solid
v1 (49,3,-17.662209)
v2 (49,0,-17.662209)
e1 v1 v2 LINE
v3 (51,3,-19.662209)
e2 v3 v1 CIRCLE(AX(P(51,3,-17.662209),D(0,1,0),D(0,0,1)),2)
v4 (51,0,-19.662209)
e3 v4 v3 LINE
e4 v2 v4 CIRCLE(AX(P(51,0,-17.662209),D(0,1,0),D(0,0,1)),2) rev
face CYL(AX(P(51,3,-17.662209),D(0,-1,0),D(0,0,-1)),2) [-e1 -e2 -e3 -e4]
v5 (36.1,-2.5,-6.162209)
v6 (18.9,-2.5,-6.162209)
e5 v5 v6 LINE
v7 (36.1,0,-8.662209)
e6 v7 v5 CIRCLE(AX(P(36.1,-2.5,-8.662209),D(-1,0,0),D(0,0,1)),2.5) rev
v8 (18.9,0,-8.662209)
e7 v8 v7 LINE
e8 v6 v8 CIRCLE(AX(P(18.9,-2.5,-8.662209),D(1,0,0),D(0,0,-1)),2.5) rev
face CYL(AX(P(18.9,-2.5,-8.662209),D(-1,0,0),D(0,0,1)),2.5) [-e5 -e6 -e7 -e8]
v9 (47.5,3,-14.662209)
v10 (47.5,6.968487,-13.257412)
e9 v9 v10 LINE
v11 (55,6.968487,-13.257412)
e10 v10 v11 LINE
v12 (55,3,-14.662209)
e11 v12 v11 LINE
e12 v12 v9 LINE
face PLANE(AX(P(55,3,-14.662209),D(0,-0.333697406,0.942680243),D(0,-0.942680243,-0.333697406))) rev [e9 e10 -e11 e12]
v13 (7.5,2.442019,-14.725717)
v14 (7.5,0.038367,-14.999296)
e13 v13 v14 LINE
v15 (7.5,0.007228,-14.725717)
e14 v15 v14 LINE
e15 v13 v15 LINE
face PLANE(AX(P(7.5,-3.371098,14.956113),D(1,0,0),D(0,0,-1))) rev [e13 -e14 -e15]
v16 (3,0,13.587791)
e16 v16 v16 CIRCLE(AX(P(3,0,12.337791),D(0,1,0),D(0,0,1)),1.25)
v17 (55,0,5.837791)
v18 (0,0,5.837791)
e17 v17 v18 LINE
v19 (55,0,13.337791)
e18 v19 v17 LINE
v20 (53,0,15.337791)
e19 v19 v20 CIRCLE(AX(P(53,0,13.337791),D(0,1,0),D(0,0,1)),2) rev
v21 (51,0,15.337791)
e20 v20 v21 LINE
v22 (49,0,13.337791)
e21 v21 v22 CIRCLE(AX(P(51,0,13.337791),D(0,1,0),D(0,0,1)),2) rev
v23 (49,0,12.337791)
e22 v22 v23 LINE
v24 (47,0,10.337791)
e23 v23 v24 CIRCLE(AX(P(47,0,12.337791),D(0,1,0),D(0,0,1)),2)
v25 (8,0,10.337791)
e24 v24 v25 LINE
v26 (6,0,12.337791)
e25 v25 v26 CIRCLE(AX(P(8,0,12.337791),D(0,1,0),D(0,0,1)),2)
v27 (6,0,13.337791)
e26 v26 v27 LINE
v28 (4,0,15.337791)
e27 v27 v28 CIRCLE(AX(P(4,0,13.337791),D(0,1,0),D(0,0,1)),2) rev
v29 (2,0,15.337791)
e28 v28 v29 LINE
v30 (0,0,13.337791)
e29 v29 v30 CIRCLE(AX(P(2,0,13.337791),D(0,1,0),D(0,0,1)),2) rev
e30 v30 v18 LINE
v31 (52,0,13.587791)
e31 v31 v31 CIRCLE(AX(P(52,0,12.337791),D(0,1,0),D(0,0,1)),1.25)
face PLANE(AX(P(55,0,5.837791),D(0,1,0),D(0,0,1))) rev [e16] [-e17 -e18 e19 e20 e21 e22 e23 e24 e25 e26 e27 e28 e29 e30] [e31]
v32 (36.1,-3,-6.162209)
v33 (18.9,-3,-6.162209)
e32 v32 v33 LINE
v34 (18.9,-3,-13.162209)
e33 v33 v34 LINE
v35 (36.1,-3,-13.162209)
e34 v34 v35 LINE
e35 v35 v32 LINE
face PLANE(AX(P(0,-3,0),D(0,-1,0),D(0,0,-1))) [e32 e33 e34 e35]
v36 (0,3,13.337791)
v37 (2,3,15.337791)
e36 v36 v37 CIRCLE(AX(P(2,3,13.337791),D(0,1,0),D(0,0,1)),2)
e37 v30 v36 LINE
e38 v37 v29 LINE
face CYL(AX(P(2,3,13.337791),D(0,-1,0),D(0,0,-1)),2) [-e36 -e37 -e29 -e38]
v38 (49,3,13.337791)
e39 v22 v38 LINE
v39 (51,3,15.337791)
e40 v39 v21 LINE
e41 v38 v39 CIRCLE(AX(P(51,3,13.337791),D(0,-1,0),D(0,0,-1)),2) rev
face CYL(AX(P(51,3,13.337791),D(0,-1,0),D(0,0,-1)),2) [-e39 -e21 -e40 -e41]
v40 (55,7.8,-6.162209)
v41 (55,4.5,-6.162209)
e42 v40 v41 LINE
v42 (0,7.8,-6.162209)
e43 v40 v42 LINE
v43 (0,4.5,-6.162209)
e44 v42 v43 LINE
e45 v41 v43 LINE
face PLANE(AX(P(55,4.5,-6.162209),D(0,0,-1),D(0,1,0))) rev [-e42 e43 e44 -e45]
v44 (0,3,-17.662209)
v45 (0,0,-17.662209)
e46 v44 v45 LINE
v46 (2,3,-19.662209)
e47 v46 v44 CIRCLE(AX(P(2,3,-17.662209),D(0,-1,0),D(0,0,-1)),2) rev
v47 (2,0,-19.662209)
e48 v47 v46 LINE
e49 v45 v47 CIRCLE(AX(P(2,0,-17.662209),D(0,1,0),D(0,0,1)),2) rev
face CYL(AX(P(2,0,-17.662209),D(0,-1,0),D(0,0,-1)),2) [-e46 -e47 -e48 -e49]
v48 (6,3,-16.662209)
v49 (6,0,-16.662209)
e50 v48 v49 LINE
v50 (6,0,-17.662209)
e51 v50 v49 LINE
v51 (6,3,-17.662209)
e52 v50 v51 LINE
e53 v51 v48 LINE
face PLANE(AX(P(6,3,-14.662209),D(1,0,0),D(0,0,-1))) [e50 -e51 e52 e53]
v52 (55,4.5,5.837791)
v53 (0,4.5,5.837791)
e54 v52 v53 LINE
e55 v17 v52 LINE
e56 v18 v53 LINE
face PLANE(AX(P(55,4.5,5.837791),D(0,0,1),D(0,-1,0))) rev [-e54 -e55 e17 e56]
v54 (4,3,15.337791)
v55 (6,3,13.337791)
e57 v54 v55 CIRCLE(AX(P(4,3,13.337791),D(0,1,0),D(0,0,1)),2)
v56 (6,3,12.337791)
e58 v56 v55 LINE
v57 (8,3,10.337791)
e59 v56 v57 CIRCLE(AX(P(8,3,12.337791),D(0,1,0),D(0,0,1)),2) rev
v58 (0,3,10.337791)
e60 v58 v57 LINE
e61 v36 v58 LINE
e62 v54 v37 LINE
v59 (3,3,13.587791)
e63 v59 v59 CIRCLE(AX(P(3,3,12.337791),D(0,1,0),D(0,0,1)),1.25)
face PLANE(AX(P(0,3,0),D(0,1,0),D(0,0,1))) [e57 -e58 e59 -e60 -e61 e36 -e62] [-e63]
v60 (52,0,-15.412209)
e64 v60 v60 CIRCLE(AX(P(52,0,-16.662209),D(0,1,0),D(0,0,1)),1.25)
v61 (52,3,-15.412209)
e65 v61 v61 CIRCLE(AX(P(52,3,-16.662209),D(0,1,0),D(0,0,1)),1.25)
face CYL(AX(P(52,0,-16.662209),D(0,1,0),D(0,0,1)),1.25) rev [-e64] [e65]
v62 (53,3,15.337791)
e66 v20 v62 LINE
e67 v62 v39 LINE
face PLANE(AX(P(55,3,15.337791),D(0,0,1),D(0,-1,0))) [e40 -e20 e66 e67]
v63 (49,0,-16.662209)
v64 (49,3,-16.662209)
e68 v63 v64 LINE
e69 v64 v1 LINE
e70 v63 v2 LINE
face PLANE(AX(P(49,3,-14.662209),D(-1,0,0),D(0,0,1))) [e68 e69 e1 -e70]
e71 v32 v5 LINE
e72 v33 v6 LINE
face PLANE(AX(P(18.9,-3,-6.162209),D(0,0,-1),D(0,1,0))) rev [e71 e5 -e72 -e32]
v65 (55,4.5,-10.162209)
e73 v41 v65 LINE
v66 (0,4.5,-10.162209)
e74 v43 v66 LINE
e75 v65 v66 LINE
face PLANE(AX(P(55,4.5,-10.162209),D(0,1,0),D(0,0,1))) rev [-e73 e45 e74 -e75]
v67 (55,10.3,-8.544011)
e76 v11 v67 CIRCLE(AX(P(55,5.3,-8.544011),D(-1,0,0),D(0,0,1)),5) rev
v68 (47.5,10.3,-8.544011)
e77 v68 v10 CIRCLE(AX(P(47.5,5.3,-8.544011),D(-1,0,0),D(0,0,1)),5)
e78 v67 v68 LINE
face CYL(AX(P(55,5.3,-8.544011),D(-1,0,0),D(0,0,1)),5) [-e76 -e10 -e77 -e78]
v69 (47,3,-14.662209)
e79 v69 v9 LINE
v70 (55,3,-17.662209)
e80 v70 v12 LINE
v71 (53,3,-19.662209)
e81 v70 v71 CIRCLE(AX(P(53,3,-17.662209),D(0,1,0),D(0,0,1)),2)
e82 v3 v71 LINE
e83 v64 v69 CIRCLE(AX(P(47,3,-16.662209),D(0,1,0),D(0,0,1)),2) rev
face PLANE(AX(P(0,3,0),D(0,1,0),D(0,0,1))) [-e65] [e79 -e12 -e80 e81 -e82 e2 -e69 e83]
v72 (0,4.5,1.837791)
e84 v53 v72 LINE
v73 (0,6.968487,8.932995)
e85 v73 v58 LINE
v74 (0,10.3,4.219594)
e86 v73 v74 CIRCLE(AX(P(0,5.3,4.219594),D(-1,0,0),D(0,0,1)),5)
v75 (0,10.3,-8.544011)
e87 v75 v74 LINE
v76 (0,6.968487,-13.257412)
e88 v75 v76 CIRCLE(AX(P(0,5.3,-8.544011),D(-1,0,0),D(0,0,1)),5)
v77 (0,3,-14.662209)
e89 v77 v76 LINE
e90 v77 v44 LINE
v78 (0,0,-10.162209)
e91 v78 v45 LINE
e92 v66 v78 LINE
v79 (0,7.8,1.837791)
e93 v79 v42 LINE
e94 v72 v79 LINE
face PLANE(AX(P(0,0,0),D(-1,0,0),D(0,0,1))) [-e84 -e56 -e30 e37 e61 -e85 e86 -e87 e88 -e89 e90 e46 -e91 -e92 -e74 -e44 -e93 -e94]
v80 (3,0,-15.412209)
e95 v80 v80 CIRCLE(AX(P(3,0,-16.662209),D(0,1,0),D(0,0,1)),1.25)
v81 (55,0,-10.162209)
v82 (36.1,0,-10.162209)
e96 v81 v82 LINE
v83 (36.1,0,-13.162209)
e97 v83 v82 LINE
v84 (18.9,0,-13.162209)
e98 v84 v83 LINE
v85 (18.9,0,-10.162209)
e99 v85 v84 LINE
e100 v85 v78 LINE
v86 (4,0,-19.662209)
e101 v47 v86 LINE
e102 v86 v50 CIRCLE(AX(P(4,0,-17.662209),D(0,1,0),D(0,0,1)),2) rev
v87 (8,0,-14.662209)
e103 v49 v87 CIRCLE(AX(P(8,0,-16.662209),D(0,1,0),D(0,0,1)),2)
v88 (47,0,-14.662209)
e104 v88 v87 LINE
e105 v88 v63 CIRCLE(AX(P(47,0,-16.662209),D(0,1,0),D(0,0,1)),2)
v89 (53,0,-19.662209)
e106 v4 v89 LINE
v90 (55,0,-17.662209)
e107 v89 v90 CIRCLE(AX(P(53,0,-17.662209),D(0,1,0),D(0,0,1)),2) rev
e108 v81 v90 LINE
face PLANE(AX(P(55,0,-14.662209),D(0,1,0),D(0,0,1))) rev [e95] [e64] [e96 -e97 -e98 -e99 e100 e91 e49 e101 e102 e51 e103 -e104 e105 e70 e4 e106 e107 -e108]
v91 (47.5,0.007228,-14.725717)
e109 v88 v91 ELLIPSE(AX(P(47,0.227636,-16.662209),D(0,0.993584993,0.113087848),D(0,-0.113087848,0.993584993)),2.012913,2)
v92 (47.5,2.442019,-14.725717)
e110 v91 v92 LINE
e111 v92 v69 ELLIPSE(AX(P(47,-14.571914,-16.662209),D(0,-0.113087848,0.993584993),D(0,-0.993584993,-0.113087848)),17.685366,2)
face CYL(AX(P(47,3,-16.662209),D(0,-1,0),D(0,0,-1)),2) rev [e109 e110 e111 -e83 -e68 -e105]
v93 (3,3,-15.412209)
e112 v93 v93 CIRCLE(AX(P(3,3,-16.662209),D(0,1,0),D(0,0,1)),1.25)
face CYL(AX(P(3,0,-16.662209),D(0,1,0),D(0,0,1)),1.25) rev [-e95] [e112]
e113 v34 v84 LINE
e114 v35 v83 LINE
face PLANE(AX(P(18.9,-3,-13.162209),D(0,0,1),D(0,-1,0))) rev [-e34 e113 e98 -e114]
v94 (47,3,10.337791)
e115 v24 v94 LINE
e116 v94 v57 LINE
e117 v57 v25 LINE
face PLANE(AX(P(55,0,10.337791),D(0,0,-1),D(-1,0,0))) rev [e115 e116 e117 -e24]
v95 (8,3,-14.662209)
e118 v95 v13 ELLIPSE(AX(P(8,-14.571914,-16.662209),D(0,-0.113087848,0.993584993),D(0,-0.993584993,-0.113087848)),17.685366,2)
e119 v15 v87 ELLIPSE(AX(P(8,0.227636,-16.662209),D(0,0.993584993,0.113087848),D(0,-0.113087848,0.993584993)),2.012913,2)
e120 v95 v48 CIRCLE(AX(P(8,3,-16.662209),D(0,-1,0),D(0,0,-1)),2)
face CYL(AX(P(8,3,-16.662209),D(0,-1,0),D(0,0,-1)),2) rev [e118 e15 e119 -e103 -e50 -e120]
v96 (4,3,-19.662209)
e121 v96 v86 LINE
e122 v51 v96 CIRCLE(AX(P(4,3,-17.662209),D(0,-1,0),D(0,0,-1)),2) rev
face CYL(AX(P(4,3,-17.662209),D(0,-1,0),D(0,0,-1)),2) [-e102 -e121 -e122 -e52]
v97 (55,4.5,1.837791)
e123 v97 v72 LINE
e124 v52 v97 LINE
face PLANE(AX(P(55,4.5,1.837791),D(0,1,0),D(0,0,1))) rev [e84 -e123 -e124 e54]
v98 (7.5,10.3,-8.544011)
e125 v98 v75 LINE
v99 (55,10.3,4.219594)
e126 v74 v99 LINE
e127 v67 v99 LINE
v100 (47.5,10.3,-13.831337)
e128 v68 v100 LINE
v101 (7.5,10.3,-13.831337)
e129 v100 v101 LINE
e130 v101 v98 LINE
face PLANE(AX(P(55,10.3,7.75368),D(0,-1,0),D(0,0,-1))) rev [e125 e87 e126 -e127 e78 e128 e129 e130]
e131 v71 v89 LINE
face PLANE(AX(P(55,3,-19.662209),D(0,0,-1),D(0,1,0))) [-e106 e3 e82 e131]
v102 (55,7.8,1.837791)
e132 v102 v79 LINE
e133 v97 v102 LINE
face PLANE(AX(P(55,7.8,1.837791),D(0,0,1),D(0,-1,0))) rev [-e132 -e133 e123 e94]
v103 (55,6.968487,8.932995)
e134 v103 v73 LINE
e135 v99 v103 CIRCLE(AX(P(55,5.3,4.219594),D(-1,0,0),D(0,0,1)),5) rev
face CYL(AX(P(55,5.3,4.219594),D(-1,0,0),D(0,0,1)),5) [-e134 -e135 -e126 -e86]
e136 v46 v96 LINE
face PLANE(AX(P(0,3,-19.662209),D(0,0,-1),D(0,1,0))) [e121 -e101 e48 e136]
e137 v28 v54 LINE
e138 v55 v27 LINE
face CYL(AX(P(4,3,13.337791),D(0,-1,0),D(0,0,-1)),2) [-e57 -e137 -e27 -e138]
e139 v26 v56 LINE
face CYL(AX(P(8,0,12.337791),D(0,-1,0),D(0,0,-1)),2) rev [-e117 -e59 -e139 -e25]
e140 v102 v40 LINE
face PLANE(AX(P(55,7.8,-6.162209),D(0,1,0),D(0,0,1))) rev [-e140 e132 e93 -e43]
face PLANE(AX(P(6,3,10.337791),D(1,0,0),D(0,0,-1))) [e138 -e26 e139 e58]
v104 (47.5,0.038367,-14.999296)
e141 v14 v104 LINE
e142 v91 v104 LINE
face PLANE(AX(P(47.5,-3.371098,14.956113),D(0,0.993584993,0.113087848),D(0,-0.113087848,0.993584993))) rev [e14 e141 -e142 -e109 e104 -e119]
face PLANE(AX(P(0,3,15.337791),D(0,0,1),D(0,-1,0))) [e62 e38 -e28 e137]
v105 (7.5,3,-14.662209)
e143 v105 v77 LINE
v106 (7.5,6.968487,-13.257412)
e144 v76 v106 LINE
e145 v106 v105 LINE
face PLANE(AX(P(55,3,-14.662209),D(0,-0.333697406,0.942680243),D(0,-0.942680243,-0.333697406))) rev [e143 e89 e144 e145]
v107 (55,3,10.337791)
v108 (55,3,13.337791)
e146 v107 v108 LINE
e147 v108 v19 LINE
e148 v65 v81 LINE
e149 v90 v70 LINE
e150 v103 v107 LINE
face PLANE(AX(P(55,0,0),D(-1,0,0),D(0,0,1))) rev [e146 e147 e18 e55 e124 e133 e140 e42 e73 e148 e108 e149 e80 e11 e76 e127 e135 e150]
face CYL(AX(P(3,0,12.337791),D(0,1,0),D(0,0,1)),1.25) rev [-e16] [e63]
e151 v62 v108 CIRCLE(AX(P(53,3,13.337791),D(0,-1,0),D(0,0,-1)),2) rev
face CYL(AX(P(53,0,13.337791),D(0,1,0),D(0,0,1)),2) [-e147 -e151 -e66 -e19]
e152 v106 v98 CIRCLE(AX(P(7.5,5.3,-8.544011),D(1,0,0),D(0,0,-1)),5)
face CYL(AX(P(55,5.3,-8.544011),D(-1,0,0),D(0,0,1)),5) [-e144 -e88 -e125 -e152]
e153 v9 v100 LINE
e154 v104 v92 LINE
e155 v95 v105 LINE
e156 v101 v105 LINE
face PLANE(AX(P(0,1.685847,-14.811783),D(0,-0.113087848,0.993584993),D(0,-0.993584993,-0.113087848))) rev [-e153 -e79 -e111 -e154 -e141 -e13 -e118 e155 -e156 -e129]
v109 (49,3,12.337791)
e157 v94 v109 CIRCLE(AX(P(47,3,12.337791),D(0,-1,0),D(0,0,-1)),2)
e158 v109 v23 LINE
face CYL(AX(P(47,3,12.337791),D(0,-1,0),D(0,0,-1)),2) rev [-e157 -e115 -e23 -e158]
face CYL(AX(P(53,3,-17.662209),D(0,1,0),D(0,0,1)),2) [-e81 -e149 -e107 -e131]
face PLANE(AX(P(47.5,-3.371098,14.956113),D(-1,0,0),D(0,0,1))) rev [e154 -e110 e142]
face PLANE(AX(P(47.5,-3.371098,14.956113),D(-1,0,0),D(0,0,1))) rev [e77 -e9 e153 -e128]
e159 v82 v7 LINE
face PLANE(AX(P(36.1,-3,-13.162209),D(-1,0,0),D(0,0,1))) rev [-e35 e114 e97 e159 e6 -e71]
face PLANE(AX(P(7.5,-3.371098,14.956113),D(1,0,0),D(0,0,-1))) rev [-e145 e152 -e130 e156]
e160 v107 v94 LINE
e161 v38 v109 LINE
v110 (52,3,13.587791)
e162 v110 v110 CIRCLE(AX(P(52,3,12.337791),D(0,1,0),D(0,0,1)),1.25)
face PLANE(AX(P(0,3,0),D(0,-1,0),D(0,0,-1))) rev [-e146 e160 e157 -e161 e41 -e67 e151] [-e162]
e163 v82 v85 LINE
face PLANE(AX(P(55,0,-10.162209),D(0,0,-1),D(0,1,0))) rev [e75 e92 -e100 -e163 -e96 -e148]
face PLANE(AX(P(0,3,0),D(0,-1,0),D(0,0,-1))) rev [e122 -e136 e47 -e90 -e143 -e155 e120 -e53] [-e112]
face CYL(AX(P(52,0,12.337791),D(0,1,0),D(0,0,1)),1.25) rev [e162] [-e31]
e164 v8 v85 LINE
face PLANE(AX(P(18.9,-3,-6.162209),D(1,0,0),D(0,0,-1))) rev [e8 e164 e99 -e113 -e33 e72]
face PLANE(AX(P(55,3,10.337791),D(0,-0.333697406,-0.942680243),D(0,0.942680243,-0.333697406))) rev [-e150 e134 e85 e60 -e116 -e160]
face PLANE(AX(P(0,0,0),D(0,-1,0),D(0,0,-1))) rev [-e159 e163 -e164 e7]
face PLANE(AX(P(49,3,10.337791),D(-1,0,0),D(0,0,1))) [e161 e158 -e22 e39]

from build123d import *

# Parameters (mm, degrees)
BOSS_EXTRUDE1_DEPTH = 55
FILLET2_R           = 5
SKETCH2_W           = 6
SKETCH2_H           = 5
BOSS_EXTRUDE2_DEPTH = 3
FILLET3_R           = 2
SKETCH3_R           = 1.25
CUT_EXTRUDE1_DEPTH  = 3
SKETCH5_W           = 17.2
SKETCH5_H           = 7
BOSS_EXTRUDE4_DEPTH = 3
BOSS_EXTRUDE5_START = 7.5
BOSS_EXTRUDE5_DEPTH = 40
SKETCH7_W           = 63.002691758
SKETCH7_H           = 45.786839941
CUT_EXTRUDE2_DEPTH  = 10
FILLET5_R           = 2.5


# Read off the part's stored shape, not the designer's step: Boss-Extrude5
with BuildPart() as part:
    # Sketch1 → Boss-Extrude1 (new body)
    with BuildSketch(Plane(origin=(0, 0, 0), x_dir=(0, 0, -1), z_dir=(1, 0, 0))):
        Polygon((10.162208757, 0), (10.162208757, 4.5), (6.162208757, 4.5), (6.162208757, 7.8), (-1.837791243, 7.8), (-1.837791243, 4.5), (-5.837791243, 4.5), (-5.837791243, 0), (-10.337791243, 0), (-10.337791243, 3), (-7.753679525, 10.3), (12.078097038, 10.3), (14.662208757, 3), (14.662208757, 0), align=None)
    extrude(amount=BOSS_EXTRUDE1_DEPTH)

    # Fillet2
    fillet2_edges = [part.edges().sort_by_distance(p)[0] for p in [
        (27.5, 10.3, 7.753679525),
        (27.5, 10.3, -12.078097038),
    ]]
    fillet(fillet2_edges, radius=FILLET2_R)

    # Sketch2 → Boss-Extrude2 (add)
    with BuildSketch(Plane.XZ):
        with Locations((3, 12.837791243)):
            Rectangle(SKETCH2_W, SKETCH2_H)
        with Locations((52, 12.837791243)):
            Rectangle(SKETCH2_W, SKETCH2_H)
        with Locations((52, -17.162208757)):
            Rectangle(SKETCH2_W, SKETCH2_H)
        with Locations((3, -17.162208757)):
            Rectangle(SKETCH2_W, SKETCH2_H)
    extrude(amount=-BOSS_EXTRUDE2_DEPTH)

    # Fillet3
    fillet3_edges = [part.edges().sort_by_distance(p)[0] for p in [
        (0, 1.5, 15.337791243),
        (6, 1.5, 15.337791243),
        (6, 1.5, 10.337791243),
        (55, 1.5, 15.337791243),
        (49, 1.5, 10.337791243),
        (49, 1.5, 15.337791243),
        (55, 1.5, -19.662208757),
        (49, 1.5, -19.662208757),
        (49, 1.5, -14.662208757),
        (0, 1.5, -19.662208757),
        (6, 1.5, -14.662208757),
        (6, 1.5, -19.662208757),
    ]]
    fillet(fillet3_edges, radius=FILLET3_R)

    # Sketch3 → Cut-Extrude1 (cut)
    with BuildSketch(Plane(origin=(0, 3, 0), x_dir=(1, 0, 0), z_dir=(0, 1, 0))):
        with Locations(Location((3, -12.337791243, 0), (0, 0, 270))):
            Circle(SKETCH3_R)
        with Locations(Location((3, 16.662208757, 0), (0, 0, 270))):
            Circle(SKETCH3_R)
        with Locations(Location((52, 16.662208757, 0), (0, 0, 270))):
            Circle(SKETCH3_R)
        with Locations(Location((52, -12.337791243, 0), (0, 0, 270))):
            Circle(SKETCH3_R)
    extrude(amount=-CUT_EXTRUDE1_DEPTH, mode=Mode.SUBTRACT)

    # Sketch5 → Boss-Extrude4 (add)
    with BuildSketch(Plane.XZ):
        with Locations((27.5, -9.662208757)):
            Rectangle(SKETCH5_W, SKETCH5_H)
    extrude(amount=BOSS_EXTRUDE4_DEPTH)

    # Boss-Extrude5 outline → Boss-Extrude5 (add)
    with BuildSketch(Plane.YZ.offset(BOSS_EXTRUDE5_START)):
        with BuildLine():
            Line((6.96848703, -13.257412341), (3, -14.662208757))
            Line((3, -14.662208757), (11.563888282, -13.687484192))
            Line((11.563888282, -13.687484192), (10.3, -2.583015869))
            Line((10.3, -2.583015869), (10.3, -8.544011124))
            ThreePointArc((10.3, -8.544011124), (9.383040237, -11.429974122), (6.96848703, -13.257412341))
        make_face()
        Polygon((0, -14.662208757), (0.038366584, -14.999295924), (3, -14.662208757), align=None)
    extrude(amount=BOSS_EXTRUDE5_DEPTH)

    # Sketch7 → Cut-Extrude2 (cut)
    with BuildSketch(Plane(origin=(0, 10.3, 0), x_dir=(1, 0, 0), z_dir=(0, 1, 0))):
        with Locations((26.50814736, 1.093849158)):
            Rectangle(SKETCH7_W, SKETCH7_H)
    extrude(amount=CUT_EXTRUDE2_DEPTH, mode=Mode.SUBTRACT)

    # Fillet5
    fillet5_edges = [part.edges().sort_by_distance(p)[0] for p in [
        (27.5, 0, -6.162208757),
    ]]
    fillet(fillet5_edges, radius=FILLET5_R)


solid = part.part
